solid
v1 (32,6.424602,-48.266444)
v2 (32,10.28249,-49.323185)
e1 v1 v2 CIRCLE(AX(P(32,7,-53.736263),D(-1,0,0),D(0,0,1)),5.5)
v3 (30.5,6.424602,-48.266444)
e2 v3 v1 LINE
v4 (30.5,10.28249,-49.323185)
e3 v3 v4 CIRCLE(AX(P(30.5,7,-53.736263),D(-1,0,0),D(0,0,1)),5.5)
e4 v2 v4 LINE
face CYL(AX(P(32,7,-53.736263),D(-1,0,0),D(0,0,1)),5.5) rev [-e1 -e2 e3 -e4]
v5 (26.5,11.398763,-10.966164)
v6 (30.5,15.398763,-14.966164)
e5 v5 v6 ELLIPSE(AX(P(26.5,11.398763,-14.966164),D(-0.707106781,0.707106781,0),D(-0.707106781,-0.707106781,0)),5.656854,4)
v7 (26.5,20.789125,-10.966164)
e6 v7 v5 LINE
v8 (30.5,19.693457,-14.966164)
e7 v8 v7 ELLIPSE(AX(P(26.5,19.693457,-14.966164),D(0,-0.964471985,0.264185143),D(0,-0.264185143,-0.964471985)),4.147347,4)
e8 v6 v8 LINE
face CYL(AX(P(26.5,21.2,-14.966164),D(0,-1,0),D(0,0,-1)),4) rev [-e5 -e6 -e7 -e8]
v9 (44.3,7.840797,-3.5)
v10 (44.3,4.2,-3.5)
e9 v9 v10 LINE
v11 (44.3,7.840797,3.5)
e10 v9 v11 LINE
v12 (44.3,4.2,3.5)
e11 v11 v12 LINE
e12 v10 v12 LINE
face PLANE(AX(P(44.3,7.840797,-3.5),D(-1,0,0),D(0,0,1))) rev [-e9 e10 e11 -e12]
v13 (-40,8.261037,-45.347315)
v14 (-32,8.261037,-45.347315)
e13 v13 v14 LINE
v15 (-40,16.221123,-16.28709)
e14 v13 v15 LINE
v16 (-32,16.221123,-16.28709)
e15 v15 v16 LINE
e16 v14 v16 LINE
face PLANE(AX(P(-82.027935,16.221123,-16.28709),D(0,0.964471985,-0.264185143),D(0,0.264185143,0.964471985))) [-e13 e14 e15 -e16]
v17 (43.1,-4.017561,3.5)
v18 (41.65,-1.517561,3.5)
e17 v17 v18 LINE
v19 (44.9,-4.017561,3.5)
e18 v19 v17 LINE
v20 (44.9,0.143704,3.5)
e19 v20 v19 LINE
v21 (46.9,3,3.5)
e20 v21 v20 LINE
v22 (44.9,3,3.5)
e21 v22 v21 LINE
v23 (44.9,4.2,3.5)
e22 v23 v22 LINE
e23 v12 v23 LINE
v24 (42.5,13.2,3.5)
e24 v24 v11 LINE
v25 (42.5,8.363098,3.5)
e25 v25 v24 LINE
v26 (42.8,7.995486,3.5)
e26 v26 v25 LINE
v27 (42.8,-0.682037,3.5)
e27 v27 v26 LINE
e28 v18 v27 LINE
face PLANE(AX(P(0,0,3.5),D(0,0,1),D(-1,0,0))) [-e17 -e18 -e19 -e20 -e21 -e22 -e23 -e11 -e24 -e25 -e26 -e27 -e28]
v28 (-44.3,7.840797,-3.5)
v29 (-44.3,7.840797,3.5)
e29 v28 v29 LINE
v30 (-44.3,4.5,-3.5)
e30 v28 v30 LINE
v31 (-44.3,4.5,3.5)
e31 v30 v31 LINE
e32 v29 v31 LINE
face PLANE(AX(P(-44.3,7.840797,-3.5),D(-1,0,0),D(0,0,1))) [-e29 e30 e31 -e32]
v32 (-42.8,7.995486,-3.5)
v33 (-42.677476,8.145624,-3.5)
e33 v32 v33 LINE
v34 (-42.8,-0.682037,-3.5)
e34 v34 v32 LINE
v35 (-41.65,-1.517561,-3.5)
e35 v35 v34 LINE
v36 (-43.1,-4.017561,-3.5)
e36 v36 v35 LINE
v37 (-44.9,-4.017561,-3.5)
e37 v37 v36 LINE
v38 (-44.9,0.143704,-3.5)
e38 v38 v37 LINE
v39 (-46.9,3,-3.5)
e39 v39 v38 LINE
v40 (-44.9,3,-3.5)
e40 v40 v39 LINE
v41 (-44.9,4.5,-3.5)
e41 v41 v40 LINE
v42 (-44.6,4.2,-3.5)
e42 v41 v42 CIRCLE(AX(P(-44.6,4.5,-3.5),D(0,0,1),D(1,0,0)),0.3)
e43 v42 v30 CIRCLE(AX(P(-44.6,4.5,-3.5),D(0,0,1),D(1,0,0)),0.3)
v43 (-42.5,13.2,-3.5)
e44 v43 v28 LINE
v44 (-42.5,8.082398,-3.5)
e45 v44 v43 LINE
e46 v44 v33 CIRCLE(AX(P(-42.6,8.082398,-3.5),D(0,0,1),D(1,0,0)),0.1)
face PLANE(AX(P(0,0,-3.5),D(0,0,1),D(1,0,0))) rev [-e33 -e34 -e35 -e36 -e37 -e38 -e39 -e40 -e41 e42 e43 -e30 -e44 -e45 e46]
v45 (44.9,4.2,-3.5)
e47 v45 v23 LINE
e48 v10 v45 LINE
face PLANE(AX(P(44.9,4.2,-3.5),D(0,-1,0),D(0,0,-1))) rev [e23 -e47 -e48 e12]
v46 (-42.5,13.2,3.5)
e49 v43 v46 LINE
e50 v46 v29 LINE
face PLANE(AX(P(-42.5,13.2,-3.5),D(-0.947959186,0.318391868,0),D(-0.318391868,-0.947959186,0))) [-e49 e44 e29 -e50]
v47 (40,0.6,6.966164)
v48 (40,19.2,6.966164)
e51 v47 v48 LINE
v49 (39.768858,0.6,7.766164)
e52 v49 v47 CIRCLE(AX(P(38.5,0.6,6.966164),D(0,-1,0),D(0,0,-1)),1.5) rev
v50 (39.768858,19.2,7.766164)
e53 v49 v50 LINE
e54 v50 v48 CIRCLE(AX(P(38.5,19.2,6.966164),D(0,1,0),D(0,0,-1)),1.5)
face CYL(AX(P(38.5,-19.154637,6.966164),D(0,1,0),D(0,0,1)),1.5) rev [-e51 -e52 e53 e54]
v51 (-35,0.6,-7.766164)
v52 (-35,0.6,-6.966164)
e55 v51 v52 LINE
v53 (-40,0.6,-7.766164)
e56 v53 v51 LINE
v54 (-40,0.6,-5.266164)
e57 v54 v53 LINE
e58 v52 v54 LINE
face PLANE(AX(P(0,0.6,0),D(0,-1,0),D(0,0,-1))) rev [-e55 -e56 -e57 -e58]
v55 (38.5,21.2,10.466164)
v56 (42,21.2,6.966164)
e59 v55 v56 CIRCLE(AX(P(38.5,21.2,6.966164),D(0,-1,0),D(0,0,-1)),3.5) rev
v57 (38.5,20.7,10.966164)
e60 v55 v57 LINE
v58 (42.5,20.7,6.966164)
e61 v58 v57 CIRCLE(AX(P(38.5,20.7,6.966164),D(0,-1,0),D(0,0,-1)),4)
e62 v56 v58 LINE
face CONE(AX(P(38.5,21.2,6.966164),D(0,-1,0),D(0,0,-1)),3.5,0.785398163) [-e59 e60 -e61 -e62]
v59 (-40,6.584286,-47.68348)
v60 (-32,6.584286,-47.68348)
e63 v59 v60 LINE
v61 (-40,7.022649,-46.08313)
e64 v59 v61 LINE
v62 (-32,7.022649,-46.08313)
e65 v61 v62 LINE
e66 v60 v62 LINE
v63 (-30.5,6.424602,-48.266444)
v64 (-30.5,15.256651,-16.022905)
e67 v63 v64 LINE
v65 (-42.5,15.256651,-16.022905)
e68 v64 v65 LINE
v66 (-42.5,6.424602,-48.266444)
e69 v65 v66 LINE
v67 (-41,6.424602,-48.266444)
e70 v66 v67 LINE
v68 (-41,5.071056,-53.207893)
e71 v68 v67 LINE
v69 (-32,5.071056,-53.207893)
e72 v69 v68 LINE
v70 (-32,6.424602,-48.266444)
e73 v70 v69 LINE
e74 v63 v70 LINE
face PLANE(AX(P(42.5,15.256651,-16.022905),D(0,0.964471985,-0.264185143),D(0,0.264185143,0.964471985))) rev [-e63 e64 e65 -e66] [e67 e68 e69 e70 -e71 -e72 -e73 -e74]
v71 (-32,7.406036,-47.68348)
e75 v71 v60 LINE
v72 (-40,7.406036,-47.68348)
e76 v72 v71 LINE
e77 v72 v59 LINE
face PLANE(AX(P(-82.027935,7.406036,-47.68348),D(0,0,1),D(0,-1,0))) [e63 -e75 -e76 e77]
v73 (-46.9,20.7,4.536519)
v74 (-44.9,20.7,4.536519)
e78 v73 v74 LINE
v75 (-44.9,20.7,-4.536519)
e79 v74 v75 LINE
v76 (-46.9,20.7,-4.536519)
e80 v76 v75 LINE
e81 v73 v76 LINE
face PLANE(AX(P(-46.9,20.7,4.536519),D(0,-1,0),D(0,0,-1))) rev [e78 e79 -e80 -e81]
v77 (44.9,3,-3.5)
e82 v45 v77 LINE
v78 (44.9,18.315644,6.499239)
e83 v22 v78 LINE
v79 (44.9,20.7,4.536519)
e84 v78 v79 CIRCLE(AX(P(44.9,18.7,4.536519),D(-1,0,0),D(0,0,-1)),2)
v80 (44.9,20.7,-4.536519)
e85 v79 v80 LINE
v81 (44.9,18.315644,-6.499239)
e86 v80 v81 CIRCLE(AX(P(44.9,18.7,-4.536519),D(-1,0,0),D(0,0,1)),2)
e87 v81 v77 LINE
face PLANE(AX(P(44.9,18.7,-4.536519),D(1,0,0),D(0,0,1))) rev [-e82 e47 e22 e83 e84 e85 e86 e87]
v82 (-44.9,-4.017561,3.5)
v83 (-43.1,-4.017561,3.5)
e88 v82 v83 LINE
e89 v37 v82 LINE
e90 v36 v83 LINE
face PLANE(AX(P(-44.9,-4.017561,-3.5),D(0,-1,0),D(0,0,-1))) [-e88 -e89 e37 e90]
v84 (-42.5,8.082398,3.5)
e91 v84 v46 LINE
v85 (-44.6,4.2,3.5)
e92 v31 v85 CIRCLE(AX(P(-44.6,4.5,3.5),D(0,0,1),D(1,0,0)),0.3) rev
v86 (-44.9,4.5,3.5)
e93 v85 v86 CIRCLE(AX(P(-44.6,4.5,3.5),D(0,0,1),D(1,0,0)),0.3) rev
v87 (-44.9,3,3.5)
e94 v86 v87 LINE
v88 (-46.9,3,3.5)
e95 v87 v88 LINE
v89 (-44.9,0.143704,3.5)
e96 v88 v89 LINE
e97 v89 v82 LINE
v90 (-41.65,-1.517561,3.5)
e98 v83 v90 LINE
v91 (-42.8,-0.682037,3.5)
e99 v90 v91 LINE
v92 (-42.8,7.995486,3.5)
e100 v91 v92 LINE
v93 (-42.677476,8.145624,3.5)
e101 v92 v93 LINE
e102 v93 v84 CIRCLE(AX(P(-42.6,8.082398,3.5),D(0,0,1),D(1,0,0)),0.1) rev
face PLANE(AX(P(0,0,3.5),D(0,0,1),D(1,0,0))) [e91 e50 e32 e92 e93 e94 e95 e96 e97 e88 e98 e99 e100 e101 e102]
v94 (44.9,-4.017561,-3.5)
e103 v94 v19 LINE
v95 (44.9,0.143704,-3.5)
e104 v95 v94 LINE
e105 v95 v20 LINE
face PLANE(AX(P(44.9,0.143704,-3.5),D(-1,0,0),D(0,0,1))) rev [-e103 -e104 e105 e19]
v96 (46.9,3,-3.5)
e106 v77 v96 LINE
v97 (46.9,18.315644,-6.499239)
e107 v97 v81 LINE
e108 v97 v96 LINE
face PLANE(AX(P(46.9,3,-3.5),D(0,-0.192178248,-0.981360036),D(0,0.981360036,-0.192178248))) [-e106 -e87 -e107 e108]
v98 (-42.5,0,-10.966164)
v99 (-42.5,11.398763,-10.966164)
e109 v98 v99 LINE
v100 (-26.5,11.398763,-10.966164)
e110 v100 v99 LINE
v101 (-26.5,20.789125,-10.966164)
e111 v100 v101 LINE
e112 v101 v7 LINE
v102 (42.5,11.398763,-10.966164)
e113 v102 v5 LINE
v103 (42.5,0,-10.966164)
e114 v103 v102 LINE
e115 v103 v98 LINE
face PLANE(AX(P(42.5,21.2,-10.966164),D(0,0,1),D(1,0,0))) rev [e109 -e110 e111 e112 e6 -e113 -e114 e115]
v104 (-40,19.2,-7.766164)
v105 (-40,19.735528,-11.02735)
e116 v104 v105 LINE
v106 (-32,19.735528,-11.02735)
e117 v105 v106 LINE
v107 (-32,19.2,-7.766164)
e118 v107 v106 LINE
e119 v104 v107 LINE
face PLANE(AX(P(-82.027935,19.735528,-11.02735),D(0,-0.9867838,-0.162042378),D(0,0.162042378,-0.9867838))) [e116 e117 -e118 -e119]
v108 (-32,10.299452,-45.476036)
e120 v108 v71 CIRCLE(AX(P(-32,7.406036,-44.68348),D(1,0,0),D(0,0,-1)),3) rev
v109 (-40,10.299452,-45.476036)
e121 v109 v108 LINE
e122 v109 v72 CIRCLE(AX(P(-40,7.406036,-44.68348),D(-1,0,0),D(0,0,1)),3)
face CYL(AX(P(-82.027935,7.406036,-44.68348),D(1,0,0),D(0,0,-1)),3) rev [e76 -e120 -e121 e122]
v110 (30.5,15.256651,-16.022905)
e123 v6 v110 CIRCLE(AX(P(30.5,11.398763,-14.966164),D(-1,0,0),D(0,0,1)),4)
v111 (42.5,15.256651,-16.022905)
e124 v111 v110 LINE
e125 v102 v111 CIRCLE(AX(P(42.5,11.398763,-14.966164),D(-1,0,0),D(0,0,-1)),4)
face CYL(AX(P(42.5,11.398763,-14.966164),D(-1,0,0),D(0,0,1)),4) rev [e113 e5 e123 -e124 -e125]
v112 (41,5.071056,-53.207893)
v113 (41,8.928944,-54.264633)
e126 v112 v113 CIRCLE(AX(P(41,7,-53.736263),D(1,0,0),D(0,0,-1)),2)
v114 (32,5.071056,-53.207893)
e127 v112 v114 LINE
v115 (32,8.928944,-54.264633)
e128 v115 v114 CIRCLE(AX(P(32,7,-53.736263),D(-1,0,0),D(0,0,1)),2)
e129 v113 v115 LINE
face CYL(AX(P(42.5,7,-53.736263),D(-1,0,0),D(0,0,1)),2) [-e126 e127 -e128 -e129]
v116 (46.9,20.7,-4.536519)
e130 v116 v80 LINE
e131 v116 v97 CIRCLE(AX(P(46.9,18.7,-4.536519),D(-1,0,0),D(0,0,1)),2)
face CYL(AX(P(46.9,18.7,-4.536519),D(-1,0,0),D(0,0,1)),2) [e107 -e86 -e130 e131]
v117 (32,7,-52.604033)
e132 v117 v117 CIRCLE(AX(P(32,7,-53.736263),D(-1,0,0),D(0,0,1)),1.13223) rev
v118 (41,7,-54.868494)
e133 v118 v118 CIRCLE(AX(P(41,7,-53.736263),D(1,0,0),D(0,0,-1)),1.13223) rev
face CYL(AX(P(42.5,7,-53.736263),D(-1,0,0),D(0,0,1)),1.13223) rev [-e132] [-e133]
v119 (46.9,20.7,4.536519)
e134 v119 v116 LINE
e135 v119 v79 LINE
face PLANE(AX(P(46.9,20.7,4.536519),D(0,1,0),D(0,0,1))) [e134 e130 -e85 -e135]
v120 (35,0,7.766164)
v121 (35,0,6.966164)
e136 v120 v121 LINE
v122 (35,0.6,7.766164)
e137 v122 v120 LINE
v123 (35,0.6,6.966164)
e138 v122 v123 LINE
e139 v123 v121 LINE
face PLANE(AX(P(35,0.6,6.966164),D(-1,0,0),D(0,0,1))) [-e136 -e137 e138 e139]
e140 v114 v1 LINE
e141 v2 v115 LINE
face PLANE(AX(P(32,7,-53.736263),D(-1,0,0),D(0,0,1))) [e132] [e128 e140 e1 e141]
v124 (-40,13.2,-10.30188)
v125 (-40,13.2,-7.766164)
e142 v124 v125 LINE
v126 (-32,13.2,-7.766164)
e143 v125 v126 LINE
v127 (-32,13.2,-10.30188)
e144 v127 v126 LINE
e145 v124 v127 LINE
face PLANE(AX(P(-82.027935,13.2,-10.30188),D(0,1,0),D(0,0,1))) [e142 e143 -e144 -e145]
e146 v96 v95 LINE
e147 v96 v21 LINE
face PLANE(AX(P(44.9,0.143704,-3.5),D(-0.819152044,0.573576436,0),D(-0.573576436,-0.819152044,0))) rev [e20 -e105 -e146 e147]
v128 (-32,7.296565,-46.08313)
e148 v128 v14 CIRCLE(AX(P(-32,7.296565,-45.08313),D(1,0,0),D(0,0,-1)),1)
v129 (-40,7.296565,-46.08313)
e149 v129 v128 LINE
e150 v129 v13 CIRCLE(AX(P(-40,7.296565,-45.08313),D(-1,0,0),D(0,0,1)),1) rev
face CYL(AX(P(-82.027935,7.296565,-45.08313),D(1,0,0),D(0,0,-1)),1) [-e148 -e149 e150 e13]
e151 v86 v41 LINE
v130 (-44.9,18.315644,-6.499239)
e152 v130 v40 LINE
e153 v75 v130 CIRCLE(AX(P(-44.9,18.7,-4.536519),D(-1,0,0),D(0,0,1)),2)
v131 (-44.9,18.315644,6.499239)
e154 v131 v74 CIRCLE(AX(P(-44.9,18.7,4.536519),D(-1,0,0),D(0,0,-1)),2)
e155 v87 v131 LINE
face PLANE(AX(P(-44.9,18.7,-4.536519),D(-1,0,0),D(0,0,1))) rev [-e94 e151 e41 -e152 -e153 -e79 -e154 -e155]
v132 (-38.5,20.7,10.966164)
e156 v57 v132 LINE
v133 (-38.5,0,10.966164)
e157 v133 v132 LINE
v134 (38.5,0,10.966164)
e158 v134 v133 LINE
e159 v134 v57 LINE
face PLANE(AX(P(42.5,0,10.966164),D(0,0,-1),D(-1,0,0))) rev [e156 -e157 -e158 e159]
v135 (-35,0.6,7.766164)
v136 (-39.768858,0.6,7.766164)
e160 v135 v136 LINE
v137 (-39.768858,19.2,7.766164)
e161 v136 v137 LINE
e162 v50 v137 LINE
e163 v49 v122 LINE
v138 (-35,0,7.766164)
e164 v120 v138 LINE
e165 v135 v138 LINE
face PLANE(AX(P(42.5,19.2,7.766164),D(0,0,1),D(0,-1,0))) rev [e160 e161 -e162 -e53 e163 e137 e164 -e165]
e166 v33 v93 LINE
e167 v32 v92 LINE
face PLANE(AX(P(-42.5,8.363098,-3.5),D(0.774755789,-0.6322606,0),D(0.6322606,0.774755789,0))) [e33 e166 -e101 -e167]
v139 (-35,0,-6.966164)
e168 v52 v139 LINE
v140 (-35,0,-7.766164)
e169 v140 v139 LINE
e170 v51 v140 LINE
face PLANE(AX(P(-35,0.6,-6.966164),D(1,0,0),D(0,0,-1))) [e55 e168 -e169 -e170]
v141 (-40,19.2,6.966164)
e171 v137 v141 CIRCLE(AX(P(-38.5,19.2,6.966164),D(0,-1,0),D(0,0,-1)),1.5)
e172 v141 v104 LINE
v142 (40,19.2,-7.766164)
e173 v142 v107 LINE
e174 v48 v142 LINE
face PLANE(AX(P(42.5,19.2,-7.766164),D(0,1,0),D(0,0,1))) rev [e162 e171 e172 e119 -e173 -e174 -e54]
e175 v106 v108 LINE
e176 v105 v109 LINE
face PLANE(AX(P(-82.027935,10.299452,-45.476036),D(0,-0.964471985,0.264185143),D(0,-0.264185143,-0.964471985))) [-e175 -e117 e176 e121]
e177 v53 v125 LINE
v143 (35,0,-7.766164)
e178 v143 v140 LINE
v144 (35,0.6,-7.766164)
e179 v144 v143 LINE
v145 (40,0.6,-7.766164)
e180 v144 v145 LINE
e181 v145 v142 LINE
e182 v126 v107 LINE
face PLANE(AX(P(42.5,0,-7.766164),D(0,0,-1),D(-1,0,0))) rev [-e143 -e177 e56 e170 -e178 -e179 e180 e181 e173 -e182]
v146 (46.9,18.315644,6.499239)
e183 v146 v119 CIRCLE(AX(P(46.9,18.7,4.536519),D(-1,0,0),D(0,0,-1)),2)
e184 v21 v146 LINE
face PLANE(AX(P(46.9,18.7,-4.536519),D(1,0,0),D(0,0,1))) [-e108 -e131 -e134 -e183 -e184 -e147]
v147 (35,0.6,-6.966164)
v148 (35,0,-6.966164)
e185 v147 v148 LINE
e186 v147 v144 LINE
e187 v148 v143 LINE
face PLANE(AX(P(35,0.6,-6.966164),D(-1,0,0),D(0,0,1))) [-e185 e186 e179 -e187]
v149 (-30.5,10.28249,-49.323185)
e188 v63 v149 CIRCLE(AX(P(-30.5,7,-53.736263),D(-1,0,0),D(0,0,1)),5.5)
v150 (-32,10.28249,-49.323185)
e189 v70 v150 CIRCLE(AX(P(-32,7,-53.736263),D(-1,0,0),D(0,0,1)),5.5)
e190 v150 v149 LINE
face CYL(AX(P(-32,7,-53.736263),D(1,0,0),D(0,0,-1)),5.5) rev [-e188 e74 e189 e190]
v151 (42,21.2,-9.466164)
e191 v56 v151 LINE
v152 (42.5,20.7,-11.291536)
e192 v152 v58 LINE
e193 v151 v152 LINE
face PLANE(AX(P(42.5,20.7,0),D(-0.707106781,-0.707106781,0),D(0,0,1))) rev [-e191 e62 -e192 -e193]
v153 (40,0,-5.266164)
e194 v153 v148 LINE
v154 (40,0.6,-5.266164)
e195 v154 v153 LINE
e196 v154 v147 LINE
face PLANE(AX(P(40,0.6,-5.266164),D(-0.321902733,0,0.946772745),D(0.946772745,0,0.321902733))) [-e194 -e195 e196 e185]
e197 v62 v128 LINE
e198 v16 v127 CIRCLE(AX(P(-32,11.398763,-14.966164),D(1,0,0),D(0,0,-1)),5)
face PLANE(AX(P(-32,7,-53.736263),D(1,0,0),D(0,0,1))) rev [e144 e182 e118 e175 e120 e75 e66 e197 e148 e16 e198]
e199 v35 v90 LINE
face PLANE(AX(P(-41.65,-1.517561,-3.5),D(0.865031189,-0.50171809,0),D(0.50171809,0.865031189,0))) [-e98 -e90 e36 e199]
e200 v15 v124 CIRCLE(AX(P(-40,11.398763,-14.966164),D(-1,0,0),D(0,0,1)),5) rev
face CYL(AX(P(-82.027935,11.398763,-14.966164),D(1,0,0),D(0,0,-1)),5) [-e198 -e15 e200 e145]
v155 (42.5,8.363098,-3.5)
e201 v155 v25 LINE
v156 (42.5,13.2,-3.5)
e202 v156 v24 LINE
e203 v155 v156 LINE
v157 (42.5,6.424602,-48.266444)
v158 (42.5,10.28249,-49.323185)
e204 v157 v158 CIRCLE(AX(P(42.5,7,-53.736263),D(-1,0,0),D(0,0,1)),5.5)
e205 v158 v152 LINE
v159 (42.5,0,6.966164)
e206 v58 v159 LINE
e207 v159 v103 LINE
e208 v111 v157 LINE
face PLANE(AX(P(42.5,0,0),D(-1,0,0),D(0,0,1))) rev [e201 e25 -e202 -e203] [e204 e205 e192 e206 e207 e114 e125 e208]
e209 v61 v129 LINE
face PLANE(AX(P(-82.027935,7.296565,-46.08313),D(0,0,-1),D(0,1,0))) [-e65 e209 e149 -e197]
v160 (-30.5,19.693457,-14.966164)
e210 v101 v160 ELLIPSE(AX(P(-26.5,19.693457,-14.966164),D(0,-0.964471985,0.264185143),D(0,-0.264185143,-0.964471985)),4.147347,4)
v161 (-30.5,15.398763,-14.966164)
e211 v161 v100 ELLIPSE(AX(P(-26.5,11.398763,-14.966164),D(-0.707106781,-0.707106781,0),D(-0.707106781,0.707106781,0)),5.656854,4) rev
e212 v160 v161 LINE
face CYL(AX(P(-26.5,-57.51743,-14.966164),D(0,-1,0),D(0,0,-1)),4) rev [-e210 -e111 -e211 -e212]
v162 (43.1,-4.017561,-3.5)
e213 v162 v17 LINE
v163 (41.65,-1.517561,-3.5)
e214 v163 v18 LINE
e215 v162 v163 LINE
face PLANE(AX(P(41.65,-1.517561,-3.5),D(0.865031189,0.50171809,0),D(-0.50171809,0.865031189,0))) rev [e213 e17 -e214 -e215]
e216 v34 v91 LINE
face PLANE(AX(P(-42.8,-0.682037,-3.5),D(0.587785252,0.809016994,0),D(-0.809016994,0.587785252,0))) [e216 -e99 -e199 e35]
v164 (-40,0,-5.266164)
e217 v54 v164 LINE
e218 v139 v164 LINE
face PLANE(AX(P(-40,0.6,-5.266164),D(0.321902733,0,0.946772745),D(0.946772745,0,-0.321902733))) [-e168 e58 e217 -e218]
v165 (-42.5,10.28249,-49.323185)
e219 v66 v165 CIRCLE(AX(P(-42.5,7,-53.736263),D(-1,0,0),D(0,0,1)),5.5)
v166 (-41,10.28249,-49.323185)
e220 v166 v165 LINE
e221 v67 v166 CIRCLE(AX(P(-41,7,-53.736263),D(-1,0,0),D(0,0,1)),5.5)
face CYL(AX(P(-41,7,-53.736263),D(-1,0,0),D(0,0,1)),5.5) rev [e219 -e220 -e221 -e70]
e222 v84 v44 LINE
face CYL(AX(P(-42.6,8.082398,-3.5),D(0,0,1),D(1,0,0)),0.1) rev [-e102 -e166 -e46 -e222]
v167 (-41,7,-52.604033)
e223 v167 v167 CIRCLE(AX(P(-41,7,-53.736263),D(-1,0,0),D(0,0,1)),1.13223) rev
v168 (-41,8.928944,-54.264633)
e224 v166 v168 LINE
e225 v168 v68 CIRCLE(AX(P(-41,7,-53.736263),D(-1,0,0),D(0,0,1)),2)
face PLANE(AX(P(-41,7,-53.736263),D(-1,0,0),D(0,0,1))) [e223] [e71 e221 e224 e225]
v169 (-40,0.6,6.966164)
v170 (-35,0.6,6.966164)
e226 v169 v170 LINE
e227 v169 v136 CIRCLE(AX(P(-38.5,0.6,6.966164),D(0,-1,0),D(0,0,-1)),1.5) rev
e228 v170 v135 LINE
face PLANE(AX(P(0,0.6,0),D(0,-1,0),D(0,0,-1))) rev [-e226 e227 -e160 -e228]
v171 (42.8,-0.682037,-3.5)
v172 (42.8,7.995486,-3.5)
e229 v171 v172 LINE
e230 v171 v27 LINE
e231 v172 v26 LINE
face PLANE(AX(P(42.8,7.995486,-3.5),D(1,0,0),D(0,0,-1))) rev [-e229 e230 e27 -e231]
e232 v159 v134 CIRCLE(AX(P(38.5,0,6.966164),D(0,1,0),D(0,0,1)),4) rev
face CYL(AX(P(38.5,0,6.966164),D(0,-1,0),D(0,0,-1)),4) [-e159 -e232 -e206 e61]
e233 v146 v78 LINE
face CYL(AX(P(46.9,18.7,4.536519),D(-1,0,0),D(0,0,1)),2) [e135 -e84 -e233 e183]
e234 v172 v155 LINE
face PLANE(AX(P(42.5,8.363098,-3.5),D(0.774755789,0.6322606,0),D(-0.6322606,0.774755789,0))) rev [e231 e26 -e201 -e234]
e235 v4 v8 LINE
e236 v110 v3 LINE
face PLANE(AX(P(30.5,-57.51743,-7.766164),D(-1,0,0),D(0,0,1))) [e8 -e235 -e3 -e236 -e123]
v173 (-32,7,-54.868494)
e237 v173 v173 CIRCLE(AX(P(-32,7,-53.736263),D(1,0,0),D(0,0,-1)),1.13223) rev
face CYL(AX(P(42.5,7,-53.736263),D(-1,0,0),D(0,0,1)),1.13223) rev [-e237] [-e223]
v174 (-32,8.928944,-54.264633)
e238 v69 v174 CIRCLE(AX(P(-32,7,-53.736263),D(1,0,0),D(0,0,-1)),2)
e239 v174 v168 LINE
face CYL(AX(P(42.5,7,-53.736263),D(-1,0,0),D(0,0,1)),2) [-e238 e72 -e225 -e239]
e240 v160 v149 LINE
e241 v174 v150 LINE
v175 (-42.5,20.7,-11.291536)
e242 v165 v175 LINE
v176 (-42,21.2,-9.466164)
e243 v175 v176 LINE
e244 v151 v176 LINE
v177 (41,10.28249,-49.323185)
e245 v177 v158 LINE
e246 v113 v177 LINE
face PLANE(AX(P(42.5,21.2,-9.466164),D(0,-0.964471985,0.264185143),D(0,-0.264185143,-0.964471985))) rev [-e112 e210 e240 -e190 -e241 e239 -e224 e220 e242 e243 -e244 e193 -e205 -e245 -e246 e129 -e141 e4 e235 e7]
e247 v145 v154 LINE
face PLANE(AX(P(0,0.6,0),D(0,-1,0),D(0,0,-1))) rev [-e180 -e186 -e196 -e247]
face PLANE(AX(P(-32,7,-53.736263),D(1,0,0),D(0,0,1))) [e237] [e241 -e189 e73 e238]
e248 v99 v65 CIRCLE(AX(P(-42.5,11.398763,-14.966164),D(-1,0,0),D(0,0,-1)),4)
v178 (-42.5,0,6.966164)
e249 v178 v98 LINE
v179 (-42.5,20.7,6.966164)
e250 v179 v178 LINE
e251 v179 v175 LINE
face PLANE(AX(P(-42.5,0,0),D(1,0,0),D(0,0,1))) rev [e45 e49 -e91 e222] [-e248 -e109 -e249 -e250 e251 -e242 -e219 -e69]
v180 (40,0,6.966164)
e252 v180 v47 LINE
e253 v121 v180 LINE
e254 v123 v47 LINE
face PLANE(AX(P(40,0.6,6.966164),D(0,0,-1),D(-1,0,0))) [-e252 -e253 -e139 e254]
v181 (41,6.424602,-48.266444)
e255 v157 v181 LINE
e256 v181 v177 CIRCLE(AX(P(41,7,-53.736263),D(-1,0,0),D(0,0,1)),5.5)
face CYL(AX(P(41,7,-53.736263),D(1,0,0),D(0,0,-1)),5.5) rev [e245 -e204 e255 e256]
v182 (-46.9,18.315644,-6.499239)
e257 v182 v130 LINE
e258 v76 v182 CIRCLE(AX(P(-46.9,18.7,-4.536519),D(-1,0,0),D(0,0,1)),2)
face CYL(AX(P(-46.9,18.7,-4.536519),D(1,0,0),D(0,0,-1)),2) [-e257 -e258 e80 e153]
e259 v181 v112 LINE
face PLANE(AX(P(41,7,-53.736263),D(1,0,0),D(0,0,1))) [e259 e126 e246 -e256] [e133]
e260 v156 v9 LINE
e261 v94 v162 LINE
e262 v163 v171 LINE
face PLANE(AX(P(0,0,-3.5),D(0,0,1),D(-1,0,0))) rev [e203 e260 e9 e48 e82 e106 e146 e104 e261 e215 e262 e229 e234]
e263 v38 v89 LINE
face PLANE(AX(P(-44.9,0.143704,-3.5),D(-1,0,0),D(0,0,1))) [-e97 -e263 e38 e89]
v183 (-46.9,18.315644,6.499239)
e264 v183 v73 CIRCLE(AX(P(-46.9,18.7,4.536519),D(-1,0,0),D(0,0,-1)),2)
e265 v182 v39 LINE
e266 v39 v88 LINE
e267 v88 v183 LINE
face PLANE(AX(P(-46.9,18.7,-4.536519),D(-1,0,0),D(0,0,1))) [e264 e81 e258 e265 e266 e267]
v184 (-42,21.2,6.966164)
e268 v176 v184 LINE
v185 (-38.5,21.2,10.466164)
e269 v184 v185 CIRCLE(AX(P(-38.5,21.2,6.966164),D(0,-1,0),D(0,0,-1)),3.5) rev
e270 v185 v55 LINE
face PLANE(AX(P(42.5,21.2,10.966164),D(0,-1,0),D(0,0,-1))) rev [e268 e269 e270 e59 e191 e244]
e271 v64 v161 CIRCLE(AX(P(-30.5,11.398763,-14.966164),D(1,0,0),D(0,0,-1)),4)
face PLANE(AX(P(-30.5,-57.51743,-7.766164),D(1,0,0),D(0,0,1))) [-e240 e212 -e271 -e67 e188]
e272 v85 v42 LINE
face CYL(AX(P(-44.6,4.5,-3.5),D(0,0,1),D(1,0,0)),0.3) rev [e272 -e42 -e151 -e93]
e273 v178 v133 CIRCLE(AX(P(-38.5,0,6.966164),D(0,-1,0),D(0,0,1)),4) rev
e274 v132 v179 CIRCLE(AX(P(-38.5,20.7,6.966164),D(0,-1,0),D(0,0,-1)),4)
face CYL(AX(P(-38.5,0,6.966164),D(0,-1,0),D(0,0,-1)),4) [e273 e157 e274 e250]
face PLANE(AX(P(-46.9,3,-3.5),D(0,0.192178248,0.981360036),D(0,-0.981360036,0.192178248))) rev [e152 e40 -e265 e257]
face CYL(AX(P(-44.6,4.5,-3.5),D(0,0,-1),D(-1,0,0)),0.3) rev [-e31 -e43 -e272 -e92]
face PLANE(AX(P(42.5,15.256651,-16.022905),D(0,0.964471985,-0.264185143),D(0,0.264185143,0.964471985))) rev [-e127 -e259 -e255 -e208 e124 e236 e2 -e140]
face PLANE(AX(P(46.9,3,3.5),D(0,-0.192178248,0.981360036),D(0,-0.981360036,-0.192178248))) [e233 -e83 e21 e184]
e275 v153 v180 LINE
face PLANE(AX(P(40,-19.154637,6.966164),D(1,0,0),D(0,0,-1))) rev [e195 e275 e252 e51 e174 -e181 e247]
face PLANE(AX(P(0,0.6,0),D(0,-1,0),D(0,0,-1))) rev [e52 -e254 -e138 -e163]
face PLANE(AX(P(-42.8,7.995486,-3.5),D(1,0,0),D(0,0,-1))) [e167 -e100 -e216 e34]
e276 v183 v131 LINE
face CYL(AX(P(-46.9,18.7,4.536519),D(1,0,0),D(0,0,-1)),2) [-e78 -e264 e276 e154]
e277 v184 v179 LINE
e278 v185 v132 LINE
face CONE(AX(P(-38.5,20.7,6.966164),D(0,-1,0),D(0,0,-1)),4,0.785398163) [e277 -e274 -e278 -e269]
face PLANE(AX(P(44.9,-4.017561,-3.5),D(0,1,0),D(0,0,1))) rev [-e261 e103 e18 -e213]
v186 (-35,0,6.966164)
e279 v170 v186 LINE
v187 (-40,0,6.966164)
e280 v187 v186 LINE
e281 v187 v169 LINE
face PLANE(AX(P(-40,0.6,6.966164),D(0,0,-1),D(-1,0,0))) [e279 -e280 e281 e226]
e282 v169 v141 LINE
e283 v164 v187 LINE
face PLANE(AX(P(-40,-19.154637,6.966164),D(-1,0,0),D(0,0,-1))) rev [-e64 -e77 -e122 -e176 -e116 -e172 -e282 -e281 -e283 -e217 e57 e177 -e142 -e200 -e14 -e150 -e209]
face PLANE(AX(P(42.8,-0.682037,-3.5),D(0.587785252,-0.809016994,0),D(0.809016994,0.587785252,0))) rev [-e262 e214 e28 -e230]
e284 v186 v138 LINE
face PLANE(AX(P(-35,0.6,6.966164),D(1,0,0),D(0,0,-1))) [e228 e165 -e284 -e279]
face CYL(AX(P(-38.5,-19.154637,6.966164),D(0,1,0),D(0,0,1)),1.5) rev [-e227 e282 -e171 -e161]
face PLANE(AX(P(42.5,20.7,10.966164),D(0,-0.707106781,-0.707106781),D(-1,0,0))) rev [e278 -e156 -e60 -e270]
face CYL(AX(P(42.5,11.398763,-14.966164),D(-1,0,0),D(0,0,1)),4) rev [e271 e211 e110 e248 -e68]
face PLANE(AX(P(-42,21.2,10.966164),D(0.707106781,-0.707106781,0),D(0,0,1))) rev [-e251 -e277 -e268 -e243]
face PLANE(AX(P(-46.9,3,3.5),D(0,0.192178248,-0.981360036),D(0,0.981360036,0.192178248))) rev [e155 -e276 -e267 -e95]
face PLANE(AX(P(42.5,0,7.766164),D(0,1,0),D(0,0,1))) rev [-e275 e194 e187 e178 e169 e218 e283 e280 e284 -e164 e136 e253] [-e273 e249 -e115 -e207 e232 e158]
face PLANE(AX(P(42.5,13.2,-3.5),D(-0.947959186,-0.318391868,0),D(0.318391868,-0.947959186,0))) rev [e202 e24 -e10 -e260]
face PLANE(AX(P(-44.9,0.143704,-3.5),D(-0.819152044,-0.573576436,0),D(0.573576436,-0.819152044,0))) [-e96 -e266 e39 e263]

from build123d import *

# Parameters (mm, degrees)
BOSS_EXTRUDE6_DEPTH            = 42.5
FILLET3_R                      = 4
BOSS_EXTRUDE7_DEPTH            = 19.200000225
SKETCH16_W                     = 12
SKETCH16_H                     = 56.251708931
BOSS_EXTRUDE8_DEPTH            = 21.200000225
MIRROR10_START                 = -2.25e-07
MIRROR10_DEPTH                 = 21.200000225
MIRROR10_START_2               = 19.2
MIRROR10_2_DEPTH               = 2
SKETCH17_R                     = 1.132230372
CUT_EXTRUDE3_DEPTH             = 109.502203117
CHAMFER1_SIZE                  = 0.5
SKETCH18_R                     = 5.5
CUT_EXTRUDE4_DEPTH             = 1.5
MIRROR12_COPY_1_SKETCH_R       = 5.5
MIRROR12_COPY_1_DEPTH          = 1.5
CUT_EXTRUDE7_REACH             = 100.98
CUT_EXTRUDE7_DIRECTION_2_REACH = 100.98
FILLET4_R                      = 4
SKETCH41_W                     = 5
SKETCH41_H                     = 0.8
BOSS_EXTRUDE20_DEPTH           = 0.6
BOSS_EXTRUDE21_DEPTH           = 3.5
BOSS_EXTRUDE23_DEPTH           = 2
FILLET5_R                      = 0.3
FILLET6_R                      = 0.1


# Read off the part's stored shape, not the designer's step: Mirror10
with BuildPart() as part:
    # Sketch14 → Boss-Extrude6 (new body)
    with BuildSketch(Plane(origin=(0, 0, 0), x_dir=(0, 0, -1), z_dir=(1, 0, 0))):
        Polygon((-7.766164208, -2.25e-07), (-10.966164208, -2.25e-07), (-10.966164208, 21.2), (10.966164208, 21.2), (10.966164208, -2.25e-07), (7.766164208, -2.25e-07), (7.766164208, 19.2), (-7.766164208, 19.2), align=None)
    extrude(amount=BOSS_EXTRUDE6_DEPTH)

    # Fillet3
    fillet3_edges = [part.edges().sort_by_distance(p)[0] for p in [
        (42.5, 10.599999888, 10.966164208),
    ]]
    fillet(fillet3_edges, radius=FILLET3_R)

    # Sketch15 → Boss-Extrude7 (add)
    with BuildSketch(Plane.XZ.offset(-19.2)):
        with BuildLine():
            Line((42.5, 6.966164208), (42.5, -7.766164208))
            Line((42.5, -7.766164208), (40, -7.766164208))
            Line((40, -7.766164208), (40, 6.966164208))
            ThreePointArc((40, 6.966164208), (39.99240423, 7.116927651), (39.969693846, 7.266164208))
            ThreePointArc((39.969693846, 7.266164208), (39.448683298, 8.128059212), (38.5, 8.466164208))
            Line((38.5, 8.466164208), (38.5, 10.966164208))
            ThreePointArc((38.5, 10.966164208), (41.029822128, 10.064550885), (42.419183588, 7.766164208))
            ThreePointArc((42.419183588, 7.766164208), (42.479744612, 7.368200056), (42.5, 6.966164208))
        make_face()
    extrude(amount=BOSS_EXTRUDE7_DEPTH)

    # Sketch16 → Boss-Extrude8 (add)
    with BuildSketch(Plane(origin=(0, 21.2, 0), x_dir=(1, 0, 0), z_dir=(0, 1, 0))):
        with Locations((36.5, 35.892018674)):
            Rectangle(SKETCH16_W, SKETCH16_H)
    extrude(amount=-BOSS_EXTRUDE8_DEPTH)

    # Mirror10 outline → Mirror10 (add)
    with BuildSketch(Plane(origin=(0, 0, 0), x_dir=(1, 0, 0), z_dir=(0, 1, 0)).offset(MIRROR10_START)):
        with BuildLine():
            Line((0, -7.766164208), (-39.768857754, -7.766164208))
            ThreePointArc((-39.768857754, -7.766164208), (-39.941056319, -7.382525451), (-40, -6.966164208))
            Line((-40, -6.966164208), (-40, 7.766164208))
            Line((-40, 7.766164208), (0, 7.766164208))
            Line((0, 7.766164208), (0, 10.966164208))
            Line((0, 10.966164208), (-30.5, 10.966164208))
            Line((-30.5, 10.966164208), (-30.5, 64.017873139))
            Line((-30.5, 64.017873139), (-42.5, 64.017873139))
            Line((-42.5, 64.017873139), (-42.5, -6.966164208))
            ThreePointArc((-42.5, -6.966164208), (-41.328427125, -9.794591333), (-38.5, -10.966164208))
            Line((-38.5, -10.966164208), (0, -10.966164208))
            Line((0, -10.966164208), (0, -7.766164208))
        make_face()
    extrude(amount=MIRROR10_DEPTH)

    # Mirror10 2 outline → Mirror10 2 (add)
    with BuildSketch(Plane(origin=(0, 0, 0), x_dir=(1, 0, 0), z_dir=(0, 1, 0)).offset(MIRROR10_START_2)):
        with BuildLine():
            ThreePointArc((-40, -6.966164208), (-39.941056319, -7.382525451), (-39.768857754, -7.766164208))
            Line((-39.768857754, -7.766164208), (0, -7.766164208))
            Line((0, -7.766164208), (0, 7.766164208))
            Line((0, 7.766164208), (-40, 7.766164208))
            Line((-40, 7.766164208), (-40, -6.966164208))
        make_face()
    extrude(amount=MIRROR10_2_DEPTH)

    # Sketch17 → Cut-Extrude3 (cut, through all)
    with BuildSketch(Plane.ZY.offset(42.5)):
        with Locations((-53.736263186, 6.999999775)):
            Circle(SKETCH17_R)
        with BuildLine():
            Line((-9.466164208, 21.2), (-54.264633471, 8.928943746))
            ThreePointArc((-54.264633471, 8.928943746), (-55.665207156, 6.47162949), (-53.207892901, 5.071055805))
            Line((-53.207892901, 5.071055805), (-16.022904778, 15.256651174))
            ThreePointArc((-16.022904778, 15.256651174), (-12.539949284, 14.578933218), (-10.966164208, 11.398763232))
            Line((-10.966164208, 11.398763232), (-10.966164208, -2.25e-07))
            Line((-10.966164208, -2.25e-07), (-58.949878023, -2.25e-07))
            Line((-58.949878023, -2.25e-07), (-64.017873139, -2.25e-07))
            Line((-64.017873139, -2.25e-07), (-64.017873139, 6.372862294))
            Line((-64.017873139, 6.372862294), (-64.017873139, 21.2))
            Line((-64.017873139, 21.2), (-9.466164208, 21.2))
        make_face()
    extrude(amount=-CUT_EXTRUDE3_DEPTH, mode=Mode.SUBTRACT)

    # Chamfer1
    chamfer1_edges = [part.edges().sort_by_distance(p)[0] for p in [
        (-42.5, 21.2, -1.25),
        (42.5, 21.2, -1.25),
        (19.25, 21.2, 10.966164208),
        (41.328427125, 21.2, 9.794591333),
        (-41.328427125, 21.2, 9.794591333),
    ]]
    chamfer(chamfer1_edges, length=CHAMFER1_SIZE)

    # Sketch18 → Cut-Extrude4 (cut)
    with BuildSketch(Plane.ZY.offset(42.5)):
        with Locations((-53.736263186, 6.999999775)):
            Circle(SKETCH18_R)
    cut_extrude4 = extrude(amount=-CUT_EXTRUDE4_DEPTH, mode=Mode.SUBTRACT)

    # Mirror11: Cut-Extrude4 across plane
    add(cut_extrude4.mirror(Plane.ZY.offset(36.5)), mode=Mode.SUBTRACT)

    # Mirror12: Cut-Extrude4 across plane
    add(cut_extrude4.mirror(Plane(origin=(0, 0, 0), x_dir=(0, 0, 1), z_dir=(1, 0, 0))), mode=Mode.SUBTRACT)

    # Mirror12 copy 1 sketch → Mirror12 copy 1 (cut)
    with BuildSketch(Plane.ZY.offset(-30.5)):
        with Locations((-53.736263186, 6.999999775)):
            Circle(MIRROR12_COPY_1_SKETCH_R)
    extrude(amount=-MIRROR12_COPY_1_DEPTH, mode=Mode.SUBTRACT)

    # Cut-Extrude7: up to this face of the body (flat: up to its plane)
    cut_extrude7_end = Plane(part.part.faces().sort_by_distance((-40, 9.599999887, -0.4))[0])
    # Sketch23 → Cut-Extrude7 (cut, up to the picked face)
    with BuildSketch(Plane.ZY.offset(36.5), mode=Mode.PRIVATE) as cut_extrude7_sk1:
        with BuildLine():
            Line((-16.287089921, 16.221123159), (-45.347315212, 8.261037353))
            ThreePointArc((-45.347315212, 8.261037353), (-45.878172566, 7.903119099), (-46.083130069, 7.296565368))
            Line((-46.083130069, 7.296565368), (-46.083130069, 7.022648503))
            Line((-46.083130069, 7.022648503), (-47.68348017, 6.584285621))
            Line((-47.68348017, 6.584285621), (-47.68348017, 7.406036215))
            ThreePointArc((-47.68348017, 7.406036215), (-47.068607659, 9.225697409), (-45.476035597, 10.299452171))
            Line((-45.476035597, 10.299452171), (-11.027350425, 19.735528015))
            Line((-11.027350425, 19.735528015), (-7.766164208, 19.2))
            Line((-7.766164208, 19.2), (-7.766164208, 13.2))
            Line((-7.766164208, 13.2), (-10.301880115, 13.2))
            ThreePointArc((-10.301880115, 13.2), (-12.713097942, 15.862359585), (-16.287089921, 16.221123159))
        make_face()
    cut_extrude7_tool1 = split(extrude(cut_extrude7_sk1.sketch, amount=CUT_EXTRUDE7_REACH, mode=Mode.PRIVATE), bisect_by=cut_extrude7_end, keep=Keep.BOTH, mode=Mode.PRIVATE)
    add(cut_extrude7_tool1.solids().sort_by(Axis((-36.5, 14.283351, -24.707146), (-1, 0, 0)))[0], mode=Mode.SUBTRACT)

    # Cut-Extrude7 direction 2: up to this face of the body (flat: up to its plane)
    cut_extrude7_direction_2_end = Plane(part.part.faces().sort_by_distance((-32, 7.583720498, -51.605249006))[0])
    # Sketch23 → Cut-Extrude7 direction 2 (cut, up to the picked face)
    with BuildSketch(Plane.ZY.offset(36.5), mode=Mode.PRIVATE) as cut_extrude7_direction_2_sk1:
        with BuildLine():
            Line((-16.287089921, 16.221123159), (-45.347315212, 8.261037353))
            ThreePointArc((-45.347315212, 8.261037353), (-45.878172566, 7.903119099), (-46.083130069, 7.296565368))
            Line((-46.083130069, 7.296565368), (-46.083130069, 7.022648503))
            Line((-46.083130069, 7.022648503), (-47.68348017, 6.584285621))
            Line((-47.68348017, 6.584285621), (-47.68348017, 7.406036215))
            ThreePointArc((-47.68348017, 7.406036215), (-47.068607659, 9.225697409), (-45.476035597, 10.299452171))
            Line((-45.476035597, 10.299452171), (-11.027350425, 19.735528015))
            Line((-11.027350425, 19.735528015), (-7.766164208, 19.2))
            Line((-7.766164208, 19.2), (-7.766164208, 13.2))
            Line((-7.766164208, 13.2), (-10.301880115, 13.2))
            ThreePointArc((-10.301880115, 13.2), (-12.713097942, 15.862359585), (-16.287089921, 16.221123159))
        make_face()
    cut_extrude7_direction_2_tool1 = split(extrude(cut_extrude7_direction_2_sk1.sketch, amount=-CUT_EXTRUDE7_DIRECTION_2_REACH, mode=Mode.PRIVATE), bisect_by=cut_extrude7_direction_2_end, keep=Keep.BOTH, mode=Mode.PRIVATE)
    add(cut_extrude7_direction_2_tool1.solids().sort_by(Axis((-36.5, 14.283351, -24.707146), (1, 0, 0)))[0], mode=Mode.SUBTRACT)

    # Fillet4
    fillet4_edges = [part.edges().sort_by_distance(p)[0] for p in [
        (-30.5, 16.093943968, -10.966164208),
        (30.5, 16.093943967, -10.966164208),
    ]]
    fillet(fillet4_edges, radius=FILLET4_R)

    # Sketch41 → Boss-Extrude20 (add)
    with BuildSketch(Plane.XZ):
        Polygon((-40, -5.266164208), (-35, -6.966164208), (-35, -7.766164208), (-40, -7.766164208), align=None)
        Polygon((35, -6.966164208), (35, -7.766164208), (40, -7.766164208), (40, -5.266164208), align=None)
        with Locations((-37.5, 7.366164208)):
            Rectangle(SKETCH41_W, SKETCH41_H)
        with Locations((37.5, 7.366164208)):
            Rectangle(SKETCH41_W, SKETCH41_H)
    extrude(amount=-BOSS_EXTRUDE20_DEPTH)

    # Sketch42 → Boss-Extrude21 (add, symmetric)
    with BuildSketch(Plane.XY):
        Polygon((-44.9, 0.143703762), (-44.9, -4.017561374), (-43.1, -4.017561374), (-41.65, -1.517561374), (-42.8, -0.682037466), (-42.8, 7.995486209), (-42.5, 8.363098451), (-42.5, 13.2), (-44.3, 7.840797374), (-44.3, 4.199999775), (-44.9, 4.199999775), (-44.9, 2.999999775), (-46.9, 2.999999775), align=None)
    boss_extrude21 = extrude(amount=BOSS_EXTRUDE21_DEPTH, both=True)

    # Sketch44 → Boss-Extrude23 (add)
    with BuildSketch(Plane.ZY.offset(44.9)):
        with BuildLine():
            Line((-3.5, 2.999999775), (3.5, 2.999999775))
            Line((3.5, 2.999999775), (6.499239291, 18.315643504))
            ThreePointArc((6.499239291, 18.315643504), (6.080655383, 19.971079661), (4.536519218, 20.7))
            Line((4.536519218, 20.7), (-4.536519218, 20.7))
            ThreePointArc((-4.536519218, 20.7), (-6.080655383, 19.971079661), (-6.499239291, 18.315643504))
            Line((-6.499239291, 18.315643504), (-3.5, 2.999999775))
        make_face()
    boss_extrude23 = extrude(amount=BOSS_EXTRUDE23_DEPTH)

    # Mirror13: Boss-Extrude21, Boss-Extrude23 across plane
    add(boss_extrude21.mirror(Plane(origin=(0, 0, 0), x_dir=(0, 0, 1), z_dir=(1, 0, 0))))
    add(boss_extrude23.mirror(Plane(origin=(0, 0, 0), x_dir=(0, 0, 1), z_dir=(1, 0, 0))))

    # Fillet5
    fillet5_edges = [part.edges().sort_by_distance(p)[0] for p in [
        (-44.9, 4.199999775, 0),
        (-44.3, 4.199999775, 0),
    ]]
    fillet(fillet5_edges, radius=FILLET5_R - 0.0001)  # a hair under: the kernel refuses the full size

    # Fillet6
    fillet6_edges = [part.edges().sort_by_distance(p)[0] for p in [
        (-42.5, 8.363098451, 0),
    ]]
    fillet(fillet6_edges, radius=FILLET6_R)


solid = part.part
